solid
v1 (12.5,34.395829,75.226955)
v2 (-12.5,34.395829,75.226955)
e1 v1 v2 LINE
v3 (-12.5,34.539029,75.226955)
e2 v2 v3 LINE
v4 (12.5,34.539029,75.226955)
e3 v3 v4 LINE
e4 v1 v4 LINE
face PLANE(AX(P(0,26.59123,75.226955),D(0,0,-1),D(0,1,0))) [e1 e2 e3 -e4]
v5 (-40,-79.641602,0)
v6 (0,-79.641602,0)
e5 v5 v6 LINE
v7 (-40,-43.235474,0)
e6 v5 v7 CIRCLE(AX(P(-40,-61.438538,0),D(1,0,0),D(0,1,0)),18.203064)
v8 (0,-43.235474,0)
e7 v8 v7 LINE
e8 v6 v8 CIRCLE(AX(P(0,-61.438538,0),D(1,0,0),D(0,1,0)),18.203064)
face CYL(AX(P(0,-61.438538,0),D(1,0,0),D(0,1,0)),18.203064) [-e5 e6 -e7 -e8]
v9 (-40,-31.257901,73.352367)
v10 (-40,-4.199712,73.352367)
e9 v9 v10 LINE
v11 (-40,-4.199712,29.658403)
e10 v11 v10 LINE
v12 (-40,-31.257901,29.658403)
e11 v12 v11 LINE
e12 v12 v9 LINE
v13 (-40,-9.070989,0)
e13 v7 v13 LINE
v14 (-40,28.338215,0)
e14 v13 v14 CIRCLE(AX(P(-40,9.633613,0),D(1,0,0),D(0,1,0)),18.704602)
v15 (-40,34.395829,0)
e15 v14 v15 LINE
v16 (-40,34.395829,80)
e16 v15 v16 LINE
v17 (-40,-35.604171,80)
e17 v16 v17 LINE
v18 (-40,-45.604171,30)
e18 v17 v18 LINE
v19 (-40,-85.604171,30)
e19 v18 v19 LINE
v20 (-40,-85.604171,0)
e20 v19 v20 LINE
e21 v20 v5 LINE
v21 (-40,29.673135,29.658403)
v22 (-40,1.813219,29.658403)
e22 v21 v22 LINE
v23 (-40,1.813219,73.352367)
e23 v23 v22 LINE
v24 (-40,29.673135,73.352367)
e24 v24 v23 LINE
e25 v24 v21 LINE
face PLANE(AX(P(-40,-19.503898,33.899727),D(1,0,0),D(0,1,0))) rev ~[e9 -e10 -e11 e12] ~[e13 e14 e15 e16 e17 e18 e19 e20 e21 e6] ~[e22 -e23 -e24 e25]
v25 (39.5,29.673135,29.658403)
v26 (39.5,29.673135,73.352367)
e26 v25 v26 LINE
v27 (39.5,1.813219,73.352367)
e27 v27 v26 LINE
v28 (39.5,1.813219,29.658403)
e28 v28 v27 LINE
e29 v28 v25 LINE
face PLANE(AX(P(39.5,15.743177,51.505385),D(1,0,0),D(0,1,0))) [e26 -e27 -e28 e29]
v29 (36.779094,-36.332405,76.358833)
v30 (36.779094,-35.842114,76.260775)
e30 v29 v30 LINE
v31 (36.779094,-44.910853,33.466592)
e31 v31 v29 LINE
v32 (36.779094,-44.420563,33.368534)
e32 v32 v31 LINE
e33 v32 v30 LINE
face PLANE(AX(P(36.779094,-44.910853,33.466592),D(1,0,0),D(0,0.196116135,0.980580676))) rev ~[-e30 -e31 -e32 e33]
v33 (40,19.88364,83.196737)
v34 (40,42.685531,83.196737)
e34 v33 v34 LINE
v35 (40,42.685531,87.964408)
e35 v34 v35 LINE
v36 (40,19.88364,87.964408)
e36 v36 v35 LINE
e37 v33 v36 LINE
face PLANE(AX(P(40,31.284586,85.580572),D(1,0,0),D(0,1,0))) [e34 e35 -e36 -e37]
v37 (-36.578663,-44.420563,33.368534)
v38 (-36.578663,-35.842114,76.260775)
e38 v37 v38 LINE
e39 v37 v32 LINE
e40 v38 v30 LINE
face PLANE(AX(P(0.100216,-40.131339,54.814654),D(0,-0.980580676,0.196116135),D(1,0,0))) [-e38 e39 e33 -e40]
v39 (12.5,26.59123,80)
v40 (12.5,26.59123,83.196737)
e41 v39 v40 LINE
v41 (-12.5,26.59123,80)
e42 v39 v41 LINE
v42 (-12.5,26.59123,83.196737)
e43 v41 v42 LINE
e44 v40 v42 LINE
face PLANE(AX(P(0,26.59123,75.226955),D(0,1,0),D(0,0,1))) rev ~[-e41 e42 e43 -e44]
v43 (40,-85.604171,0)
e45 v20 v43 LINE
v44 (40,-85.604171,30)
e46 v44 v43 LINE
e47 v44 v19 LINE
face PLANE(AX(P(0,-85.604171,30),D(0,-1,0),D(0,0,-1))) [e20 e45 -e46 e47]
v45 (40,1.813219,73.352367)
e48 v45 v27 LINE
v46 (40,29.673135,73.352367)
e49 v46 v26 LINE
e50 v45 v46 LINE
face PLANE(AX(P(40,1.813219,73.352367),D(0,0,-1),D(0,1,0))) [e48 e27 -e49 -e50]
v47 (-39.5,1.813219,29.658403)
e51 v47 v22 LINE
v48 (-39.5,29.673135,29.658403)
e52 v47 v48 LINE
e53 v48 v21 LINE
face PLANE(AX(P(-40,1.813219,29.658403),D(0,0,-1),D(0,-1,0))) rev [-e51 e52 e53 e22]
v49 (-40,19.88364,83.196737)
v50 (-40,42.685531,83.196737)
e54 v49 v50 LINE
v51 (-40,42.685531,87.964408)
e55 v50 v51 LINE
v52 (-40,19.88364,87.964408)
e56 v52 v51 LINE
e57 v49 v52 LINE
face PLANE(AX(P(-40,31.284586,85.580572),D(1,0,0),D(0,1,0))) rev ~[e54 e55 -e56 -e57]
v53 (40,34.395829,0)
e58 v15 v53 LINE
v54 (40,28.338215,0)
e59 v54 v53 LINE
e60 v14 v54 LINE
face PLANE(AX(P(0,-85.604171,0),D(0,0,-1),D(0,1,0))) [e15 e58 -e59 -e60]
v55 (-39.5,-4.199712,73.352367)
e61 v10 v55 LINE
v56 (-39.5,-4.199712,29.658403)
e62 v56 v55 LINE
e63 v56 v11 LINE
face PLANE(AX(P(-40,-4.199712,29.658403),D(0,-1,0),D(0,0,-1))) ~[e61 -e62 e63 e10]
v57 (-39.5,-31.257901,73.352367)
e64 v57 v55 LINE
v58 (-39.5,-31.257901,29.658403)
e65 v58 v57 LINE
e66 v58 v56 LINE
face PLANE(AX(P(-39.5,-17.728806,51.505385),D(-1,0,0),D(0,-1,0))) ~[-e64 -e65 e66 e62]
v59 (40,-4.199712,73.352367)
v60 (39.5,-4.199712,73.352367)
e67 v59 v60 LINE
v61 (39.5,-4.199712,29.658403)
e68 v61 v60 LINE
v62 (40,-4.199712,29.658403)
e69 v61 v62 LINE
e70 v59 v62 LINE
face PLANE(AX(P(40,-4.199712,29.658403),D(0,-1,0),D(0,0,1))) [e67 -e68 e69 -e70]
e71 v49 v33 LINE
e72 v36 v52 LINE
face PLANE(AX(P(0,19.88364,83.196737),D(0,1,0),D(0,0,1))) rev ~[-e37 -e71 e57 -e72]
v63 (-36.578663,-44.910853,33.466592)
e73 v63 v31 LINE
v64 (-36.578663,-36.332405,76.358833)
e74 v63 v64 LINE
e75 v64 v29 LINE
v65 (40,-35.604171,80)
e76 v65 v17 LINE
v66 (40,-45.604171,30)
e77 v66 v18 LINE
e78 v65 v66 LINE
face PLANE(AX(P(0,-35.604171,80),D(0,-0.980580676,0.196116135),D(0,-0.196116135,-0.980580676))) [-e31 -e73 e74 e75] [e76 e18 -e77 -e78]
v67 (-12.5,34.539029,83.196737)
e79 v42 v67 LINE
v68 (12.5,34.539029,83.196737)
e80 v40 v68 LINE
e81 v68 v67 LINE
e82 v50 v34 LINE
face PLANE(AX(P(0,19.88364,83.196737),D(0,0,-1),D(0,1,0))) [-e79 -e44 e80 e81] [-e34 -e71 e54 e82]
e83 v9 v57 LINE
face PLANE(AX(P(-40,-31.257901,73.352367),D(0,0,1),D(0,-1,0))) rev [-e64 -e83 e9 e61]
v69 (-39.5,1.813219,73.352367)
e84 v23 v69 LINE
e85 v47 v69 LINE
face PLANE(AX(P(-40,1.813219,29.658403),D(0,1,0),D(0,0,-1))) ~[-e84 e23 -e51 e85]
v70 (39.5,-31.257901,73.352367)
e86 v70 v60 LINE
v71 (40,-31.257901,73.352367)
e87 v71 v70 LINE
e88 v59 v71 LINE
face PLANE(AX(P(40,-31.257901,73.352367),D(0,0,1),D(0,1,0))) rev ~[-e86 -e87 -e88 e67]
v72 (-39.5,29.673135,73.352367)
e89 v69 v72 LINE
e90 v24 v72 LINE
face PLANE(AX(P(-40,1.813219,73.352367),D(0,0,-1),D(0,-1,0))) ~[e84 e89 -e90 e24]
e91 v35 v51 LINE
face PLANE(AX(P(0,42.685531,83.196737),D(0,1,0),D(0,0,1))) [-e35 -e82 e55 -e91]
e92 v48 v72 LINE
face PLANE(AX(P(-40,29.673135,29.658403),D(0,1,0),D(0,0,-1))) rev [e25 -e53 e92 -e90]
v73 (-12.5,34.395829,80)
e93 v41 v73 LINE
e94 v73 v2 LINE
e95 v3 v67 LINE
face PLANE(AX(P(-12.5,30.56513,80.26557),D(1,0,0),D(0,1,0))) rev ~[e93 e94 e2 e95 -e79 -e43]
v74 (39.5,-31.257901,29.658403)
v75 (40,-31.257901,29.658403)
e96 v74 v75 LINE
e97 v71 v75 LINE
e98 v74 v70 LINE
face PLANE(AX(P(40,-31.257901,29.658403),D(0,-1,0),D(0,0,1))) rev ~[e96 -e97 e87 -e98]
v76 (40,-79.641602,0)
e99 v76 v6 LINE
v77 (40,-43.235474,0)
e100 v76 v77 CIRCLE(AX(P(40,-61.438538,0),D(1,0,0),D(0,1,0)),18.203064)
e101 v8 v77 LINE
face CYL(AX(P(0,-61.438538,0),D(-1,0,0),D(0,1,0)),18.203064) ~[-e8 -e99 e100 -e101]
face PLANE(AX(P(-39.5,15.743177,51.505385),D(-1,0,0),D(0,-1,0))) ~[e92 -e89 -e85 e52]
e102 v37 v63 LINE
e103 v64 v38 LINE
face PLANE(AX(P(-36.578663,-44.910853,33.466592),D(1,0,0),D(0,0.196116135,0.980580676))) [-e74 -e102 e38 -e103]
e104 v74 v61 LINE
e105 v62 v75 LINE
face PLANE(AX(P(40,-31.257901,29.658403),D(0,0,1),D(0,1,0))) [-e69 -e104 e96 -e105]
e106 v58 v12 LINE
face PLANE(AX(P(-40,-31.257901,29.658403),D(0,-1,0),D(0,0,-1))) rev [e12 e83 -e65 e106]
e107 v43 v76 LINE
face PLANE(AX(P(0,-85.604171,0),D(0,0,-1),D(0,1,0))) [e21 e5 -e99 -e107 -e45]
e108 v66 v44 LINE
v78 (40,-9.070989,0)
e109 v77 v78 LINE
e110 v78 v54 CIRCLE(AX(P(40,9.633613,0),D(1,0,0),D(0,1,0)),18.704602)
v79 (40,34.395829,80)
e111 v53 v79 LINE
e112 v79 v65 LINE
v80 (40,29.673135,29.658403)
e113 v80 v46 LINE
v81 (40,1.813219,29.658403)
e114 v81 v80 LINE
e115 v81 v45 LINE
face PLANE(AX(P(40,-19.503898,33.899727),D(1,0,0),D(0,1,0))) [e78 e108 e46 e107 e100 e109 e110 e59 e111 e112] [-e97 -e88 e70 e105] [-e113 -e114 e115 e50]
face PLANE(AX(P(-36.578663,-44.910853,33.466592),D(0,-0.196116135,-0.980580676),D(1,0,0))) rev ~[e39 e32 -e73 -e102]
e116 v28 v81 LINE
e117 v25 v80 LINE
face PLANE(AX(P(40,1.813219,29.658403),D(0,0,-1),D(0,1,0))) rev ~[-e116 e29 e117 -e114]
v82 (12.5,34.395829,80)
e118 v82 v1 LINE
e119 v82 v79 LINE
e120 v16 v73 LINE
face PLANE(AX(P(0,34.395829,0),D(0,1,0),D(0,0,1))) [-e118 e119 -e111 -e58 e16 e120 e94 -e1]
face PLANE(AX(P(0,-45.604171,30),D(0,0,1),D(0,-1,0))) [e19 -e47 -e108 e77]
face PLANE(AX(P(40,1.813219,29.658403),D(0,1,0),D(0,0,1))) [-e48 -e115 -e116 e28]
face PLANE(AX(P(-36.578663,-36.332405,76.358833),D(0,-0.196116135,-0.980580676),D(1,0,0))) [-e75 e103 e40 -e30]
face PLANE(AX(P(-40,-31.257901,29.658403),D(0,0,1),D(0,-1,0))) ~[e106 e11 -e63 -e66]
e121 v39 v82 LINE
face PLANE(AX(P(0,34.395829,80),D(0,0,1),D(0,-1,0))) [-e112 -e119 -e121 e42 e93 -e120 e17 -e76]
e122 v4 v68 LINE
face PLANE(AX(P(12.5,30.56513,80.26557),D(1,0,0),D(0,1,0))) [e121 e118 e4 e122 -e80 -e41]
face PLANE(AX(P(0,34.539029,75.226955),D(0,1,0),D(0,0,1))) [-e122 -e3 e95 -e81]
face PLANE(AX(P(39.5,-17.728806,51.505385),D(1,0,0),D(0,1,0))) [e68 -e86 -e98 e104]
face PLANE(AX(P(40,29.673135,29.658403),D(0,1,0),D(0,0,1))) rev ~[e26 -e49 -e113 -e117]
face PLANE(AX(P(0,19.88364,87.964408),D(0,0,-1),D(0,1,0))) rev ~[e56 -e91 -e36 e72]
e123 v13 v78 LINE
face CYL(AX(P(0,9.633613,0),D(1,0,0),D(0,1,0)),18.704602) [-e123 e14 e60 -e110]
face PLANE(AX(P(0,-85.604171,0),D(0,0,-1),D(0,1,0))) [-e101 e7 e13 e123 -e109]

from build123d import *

# Parameters (mm, degrees)
F2_DEPTH  = 40
F1_R      = 18.2030638816
F1_R_2    = 18.7046022313
F3_DEPTH  = 40
F4_W      = 27.0581897348
F4_H      = 43.6939634383
F4_W_2    = 27.8599155135
F5_DEPTH  = 0.5
F6_W      = 73.3577571809
F6_H      = 43.7416750938
F7_DEPTH  = 0.5
F8_W      = 7.9477988183
F8_H      = 10.0772306323
F9_DEPTH  = 12.5
F10_W     = 22.8018909693
F10_H     = 4.7676712275
F11_DEPTH = 40


# Not quite as in the source:
# - a pattern or mirror of a feature is missing from the dataset's text; its kind, count and spacing are read off the source's solid
# - a feature names something its author has since deleted; it is built from what else it names


with BuildPart() as f2:
    # F0 (on Right) → F2 (new body, symmetric)
    with BuildSketch(Plane.YZ):
        Polygon((-85.6041714479, 30), (-85.6041714479, 0), (34.3958285521, 0), (34.3958285521, 80), (-35.6041714479, 80), (-45.6041714479, 30), align=None)
    extrude(amount=F2_DEPTH, both=True)

    # F1 (on Right) → F3 (join, symmetric)
    with BuildSketch(Plane.YZ):
        with Locations((-61.4385381341, 0)):
            Circle(F1_R)
        with Locations((9.633612819, 0)):
            Circle(F1_R_2)
    extrude(amount=F3_DEPTH, both=True)

    # F4 (on face) → F5 (cut, symmetric)
    with BuildSketch(Plane.YZ.offset(40)):
        with Locations((-17.7288064733, 51.5053849667)):
            Rectangle(F4_W, F4_H)
        with Locations((15.7431771513, 51.5053849667)):
            Rectangle(F4_W_2, F4_H)
    f5 = extrude(amount=F5_DEPTH, both=True, mode=Mode.SUBTRACT)

    # F5_copies: F5 across plane
    add(f5.mirror(Plane(origin=(0, 0, 0), x_dir=(0, 0, -1), z_dir=(-1, 0, 0))), mode=Mode.SUBTRACT)

    # F6 (on face) → F7 (cut, symmetric)
    with BuildSketch(Plane(origin=(0, -49.619395623, 9.9238791246), x_dir=(1, 0, 0), z_dir=(0, -0.9805806757, 0.1961161351))):
        with Locations((0.100215897, 45.8797877654)):
            Rectangle(F6_W, F6_H)
    extrude(amount=F7_DEPTH, both=True, mode=Mode.SUBTRACT)

    # F8 (on Right) → F9 (join, symmetric)
    with BuildSketch(Plane.YZ):
        with Locations((30.565129593, 80.2655704319)):
            Rectangle(F8_W, F8_H)
    extrude(amount=F9_DEPTH, both=True)

    # F10 (on Right) → F11 (join, symmetric)
    with BuildSketch(Plane.YZ):
        with Locations((31.2845855951, 85.5805724859)):
            Rectangle(F10_W, F10_H)
    extrude(amount=F11_DEPTH, both=True)


solid = f2.part
